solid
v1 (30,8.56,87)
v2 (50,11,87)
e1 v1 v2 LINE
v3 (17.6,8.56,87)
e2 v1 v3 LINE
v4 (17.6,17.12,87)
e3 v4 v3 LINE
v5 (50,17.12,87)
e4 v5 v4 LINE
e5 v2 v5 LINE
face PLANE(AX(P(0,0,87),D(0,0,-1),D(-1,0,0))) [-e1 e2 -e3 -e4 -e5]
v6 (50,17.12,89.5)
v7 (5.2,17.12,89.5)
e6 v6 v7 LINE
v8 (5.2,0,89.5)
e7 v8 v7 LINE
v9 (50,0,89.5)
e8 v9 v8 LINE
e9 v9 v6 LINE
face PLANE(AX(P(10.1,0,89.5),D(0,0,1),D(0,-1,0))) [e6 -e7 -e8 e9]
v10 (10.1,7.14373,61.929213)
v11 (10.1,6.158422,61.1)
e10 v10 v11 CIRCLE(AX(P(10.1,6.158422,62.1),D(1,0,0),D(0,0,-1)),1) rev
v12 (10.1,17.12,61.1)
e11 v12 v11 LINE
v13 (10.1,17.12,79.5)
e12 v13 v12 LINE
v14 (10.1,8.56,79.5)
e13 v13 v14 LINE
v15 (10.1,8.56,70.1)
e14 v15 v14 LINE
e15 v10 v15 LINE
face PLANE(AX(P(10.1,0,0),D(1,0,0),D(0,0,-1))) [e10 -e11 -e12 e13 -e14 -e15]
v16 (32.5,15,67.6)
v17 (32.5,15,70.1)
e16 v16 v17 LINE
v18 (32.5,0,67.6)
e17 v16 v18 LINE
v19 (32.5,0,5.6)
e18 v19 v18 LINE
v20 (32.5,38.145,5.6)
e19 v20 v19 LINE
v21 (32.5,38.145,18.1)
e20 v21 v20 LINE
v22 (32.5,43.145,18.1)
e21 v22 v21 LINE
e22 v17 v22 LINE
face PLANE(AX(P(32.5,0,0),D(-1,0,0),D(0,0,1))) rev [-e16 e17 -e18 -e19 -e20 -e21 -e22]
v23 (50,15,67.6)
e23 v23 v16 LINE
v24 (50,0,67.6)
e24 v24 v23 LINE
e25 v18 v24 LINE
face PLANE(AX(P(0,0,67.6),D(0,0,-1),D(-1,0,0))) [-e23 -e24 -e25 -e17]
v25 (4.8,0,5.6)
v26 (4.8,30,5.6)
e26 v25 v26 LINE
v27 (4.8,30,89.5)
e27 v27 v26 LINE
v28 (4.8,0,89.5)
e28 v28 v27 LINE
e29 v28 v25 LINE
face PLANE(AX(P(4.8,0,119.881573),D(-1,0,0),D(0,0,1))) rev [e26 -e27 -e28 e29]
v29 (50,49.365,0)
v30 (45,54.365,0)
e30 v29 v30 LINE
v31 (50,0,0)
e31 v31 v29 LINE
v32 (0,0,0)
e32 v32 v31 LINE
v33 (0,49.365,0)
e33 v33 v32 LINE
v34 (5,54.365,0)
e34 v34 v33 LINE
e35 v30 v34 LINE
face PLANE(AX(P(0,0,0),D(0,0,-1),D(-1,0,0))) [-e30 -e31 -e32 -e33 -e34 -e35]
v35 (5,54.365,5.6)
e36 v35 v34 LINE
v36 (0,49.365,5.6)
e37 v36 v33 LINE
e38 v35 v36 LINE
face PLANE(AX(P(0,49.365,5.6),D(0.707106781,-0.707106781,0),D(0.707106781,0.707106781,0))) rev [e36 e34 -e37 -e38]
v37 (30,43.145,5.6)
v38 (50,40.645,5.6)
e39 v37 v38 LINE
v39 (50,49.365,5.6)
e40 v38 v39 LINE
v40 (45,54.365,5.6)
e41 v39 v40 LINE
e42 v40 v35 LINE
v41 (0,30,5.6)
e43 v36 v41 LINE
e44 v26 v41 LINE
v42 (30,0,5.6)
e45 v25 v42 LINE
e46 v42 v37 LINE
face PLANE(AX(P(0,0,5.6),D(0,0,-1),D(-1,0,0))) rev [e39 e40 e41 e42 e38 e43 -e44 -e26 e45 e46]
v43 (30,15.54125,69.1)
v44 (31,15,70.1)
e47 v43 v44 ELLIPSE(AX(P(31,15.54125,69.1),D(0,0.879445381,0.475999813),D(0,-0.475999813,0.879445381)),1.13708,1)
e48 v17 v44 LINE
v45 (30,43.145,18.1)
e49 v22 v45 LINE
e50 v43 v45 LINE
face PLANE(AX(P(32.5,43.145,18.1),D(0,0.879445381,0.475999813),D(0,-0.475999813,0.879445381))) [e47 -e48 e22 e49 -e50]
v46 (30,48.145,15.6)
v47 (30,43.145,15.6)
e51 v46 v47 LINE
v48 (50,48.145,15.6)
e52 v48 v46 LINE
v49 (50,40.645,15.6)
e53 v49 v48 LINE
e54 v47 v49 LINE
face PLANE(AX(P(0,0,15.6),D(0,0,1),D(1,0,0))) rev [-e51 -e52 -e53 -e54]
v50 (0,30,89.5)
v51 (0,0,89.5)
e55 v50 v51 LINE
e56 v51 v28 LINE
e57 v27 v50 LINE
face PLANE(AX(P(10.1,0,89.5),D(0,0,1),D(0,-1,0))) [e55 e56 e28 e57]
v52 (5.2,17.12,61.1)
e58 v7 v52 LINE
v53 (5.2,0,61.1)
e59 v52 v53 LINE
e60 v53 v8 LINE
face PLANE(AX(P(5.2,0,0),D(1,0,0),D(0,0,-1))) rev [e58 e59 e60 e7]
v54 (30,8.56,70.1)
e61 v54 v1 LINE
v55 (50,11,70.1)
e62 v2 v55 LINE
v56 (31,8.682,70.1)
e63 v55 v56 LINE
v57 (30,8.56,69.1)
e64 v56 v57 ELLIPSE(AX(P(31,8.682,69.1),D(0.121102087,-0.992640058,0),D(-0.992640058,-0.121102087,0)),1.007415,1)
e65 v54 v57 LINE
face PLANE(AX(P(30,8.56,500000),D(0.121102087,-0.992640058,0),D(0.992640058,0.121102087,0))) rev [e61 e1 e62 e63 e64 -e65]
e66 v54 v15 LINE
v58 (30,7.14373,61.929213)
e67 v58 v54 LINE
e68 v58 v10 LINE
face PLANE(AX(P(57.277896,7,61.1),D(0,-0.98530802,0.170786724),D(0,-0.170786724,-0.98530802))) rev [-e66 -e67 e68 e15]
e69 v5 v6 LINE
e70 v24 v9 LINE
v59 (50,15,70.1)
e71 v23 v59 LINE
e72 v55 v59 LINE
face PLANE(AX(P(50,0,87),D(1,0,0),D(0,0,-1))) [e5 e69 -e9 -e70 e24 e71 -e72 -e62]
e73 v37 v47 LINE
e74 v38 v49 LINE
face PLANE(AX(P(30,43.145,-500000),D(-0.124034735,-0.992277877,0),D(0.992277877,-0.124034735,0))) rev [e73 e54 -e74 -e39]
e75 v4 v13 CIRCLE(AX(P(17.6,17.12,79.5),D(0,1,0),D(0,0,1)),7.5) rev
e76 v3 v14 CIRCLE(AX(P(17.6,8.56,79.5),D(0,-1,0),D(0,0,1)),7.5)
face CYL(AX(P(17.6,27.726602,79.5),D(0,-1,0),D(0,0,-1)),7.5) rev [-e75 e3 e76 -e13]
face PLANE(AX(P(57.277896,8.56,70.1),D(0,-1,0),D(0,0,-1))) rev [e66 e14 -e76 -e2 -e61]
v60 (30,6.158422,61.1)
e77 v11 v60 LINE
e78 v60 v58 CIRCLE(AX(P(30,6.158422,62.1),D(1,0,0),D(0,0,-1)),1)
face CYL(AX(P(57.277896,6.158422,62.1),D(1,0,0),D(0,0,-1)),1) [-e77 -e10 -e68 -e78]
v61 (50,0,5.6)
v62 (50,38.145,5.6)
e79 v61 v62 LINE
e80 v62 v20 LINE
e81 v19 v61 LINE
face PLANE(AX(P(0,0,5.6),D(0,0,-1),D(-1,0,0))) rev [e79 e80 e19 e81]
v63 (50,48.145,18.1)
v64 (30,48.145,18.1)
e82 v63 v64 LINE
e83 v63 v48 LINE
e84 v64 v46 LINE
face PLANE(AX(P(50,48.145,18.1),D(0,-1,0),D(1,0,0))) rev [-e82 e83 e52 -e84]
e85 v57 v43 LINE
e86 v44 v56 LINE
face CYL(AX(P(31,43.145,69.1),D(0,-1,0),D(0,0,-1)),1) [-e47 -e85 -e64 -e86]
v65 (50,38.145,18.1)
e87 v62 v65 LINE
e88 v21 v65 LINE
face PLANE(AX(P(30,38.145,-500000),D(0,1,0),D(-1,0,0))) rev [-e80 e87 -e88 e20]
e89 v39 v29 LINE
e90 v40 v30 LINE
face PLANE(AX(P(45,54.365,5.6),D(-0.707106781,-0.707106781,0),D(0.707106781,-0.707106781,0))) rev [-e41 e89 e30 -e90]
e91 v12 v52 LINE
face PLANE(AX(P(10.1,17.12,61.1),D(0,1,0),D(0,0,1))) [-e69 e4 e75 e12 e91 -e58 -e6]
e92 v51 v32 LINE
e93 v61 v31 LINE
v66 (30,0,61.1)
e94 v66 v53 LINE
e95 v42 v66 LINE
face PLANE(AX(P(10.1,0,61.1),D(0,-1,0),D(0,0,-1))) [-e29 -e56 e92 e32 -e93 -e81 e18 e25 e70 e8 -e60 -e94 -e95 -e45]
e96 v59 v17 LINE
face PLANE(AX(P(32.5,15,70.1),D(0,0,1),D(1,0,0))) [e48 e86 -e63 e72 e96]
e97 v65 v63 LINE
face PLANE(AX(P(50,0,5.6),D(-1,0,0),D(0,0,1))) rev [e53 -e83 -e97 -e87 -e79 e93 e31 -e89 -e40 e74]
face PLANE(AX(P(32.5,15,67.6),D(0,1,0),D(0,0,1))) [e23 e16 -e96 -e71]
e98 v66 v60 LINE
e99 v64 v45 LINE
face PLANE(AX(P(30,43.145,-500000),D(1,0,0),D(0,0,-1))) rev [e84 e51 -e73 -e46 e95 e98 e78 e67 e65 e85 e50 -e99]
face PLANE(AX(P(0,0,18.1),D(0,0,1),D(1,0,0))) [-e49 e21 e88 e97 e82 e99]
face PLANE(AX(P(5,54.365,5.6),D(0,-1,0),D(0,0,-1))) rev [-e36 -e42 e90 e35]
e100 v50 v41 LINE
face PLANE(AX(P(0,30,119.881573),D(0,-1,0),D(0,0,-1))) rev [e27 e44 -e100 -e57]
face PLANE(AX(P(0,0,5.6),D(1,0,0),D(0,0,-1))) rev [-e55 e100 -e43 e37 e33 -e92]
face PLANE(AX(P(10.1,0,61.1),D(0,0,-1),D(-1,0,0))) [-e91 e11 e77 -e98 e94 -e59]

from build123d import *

# Parameters (mm, degrees)
EXTRUDE_1_DEPTH  = 5.6
SKETCH_3_W       = 20
SKETCH_3_H       = 10
EXTRUDE_2_DEPTH  = 2.5
EXTRUDE_3_REACH  = 77.491
EXTRUDE_4_DEPTH  = 2.5
SKETCH_7_W       = 28.4
SKETCH_7_H       = 17.12
EXTRUDE_5_DEPTH  = 4.9
SKETCH_8_W       = 39.9
SKETCH_8_H       = 17.12
EXTRUDE_6_DEPTH  = 2.5
SKETCH_9_W       = 17.5
SKETCH_9_H       = 15
EXTRUDE_7_DEPTH  = 2.5
EXTRUDE_8_DEPTH  = 19.9
FILLET_1_R       = 1
EXTRUDE_9_REACH  = 103.831
SKETCH_14_W      = 4.8
SKETCH_14_H      = 30
EXTRUDE_12_DEPTH = 83.9
EXTRUDE_13_DEPTH = 8.56
FILLET_3_R       = 1


with BuildPart() as part:
    # 草图1 → 凸台-拉伸1 (new body)
    with BuildSketch(Plane.XY):
        Polygon((0, 49.365), (5, 54.365), (45, 54.365), (50, 49.365), (50, 0), (0, 0), align=None)
    extrude(amount=EXTRUDE_1_DEPTH)

    # 草图5 → 凸台-拉伸3 (add, up to next)
    with BuildSketch(Plane(origin=(0, 0, 15.6), x_dir=(-1, 0, 0), z_dir=(0, 0, -1)), mode=Mode.PRIVATE) as extrude_3_sk1:
        Polygon((-30, 43.145), (-50, 40.645), (-50, 38.145), (-30, 38.145), align=None)
    extrude_3_tool1 = extrude(extrude_3_sk1.sketch, amount=EXTRUDE_3_REACH, mode=Mode.PRIVATE) - part.part


with BuildPart() as body_2:
    # 草图3 → 凸台-拉伸2 (new body)
    with BuildSketch(Plane.XY.offset(15.6)):
        with Locations((40, 43.145)):
            Rectangle(SKETCH_3_W, SKETCH_3_H)
    extrude(amount=EXTRUDE_2_DEPTH)


with BuildPart() as part_1:
    add(part.part)

    add(body_2.part)  # 凸台-拉伸3 merges body 2
    add(extrude_3_tool1.solids().sort_by_distance((38.888889, 40.089444, 15.6))[0])

    # 草图6 → 凸台-拉伸4 (add)
    with BuildSketch(Plane.ZY.offset(-30)):
        Polygon((18.1, 43.145), (70.1, 15), (70.1, 0), (5.6, 0), (5.6, 38.145), (18.1, 38.145), align=None)
    extrude(amount=-EXTRUDE_4_DEPTH)

    # 草图9 → 凸台-拉伸7 (add)
    with BuildSketch(Plane.XY.offset(70.1)):
        with Locations((41.25, 7.5)):
            Rectangle(SKETCH_9_W, SKETCH_9_H)
    extrude(amount=-EXTRUDE_7_DEPTH)



with BuildPart() as body_2_2:
    # 草图7 → 凸台-拉伸5 (new body)
    with BuildSketch(Plane.ZY.offset(-5.2)):
        with Locations((75.3, 8.56)):
            Rectangle(SKETCH_7_W, SKETCH_7_H)
    extrude(amount=-EXTRUDE_5_DEPTH)

    # 草图8 → 凸台-拉伸6 (add)
    with BuildSketch(Plane.XY.offset(89.5)):
        with Locations((30.05, 8.56)):
            Rectangle(SKETCH_8_W, SKETCH_8_H)
    extrude(amount=-EXTRUDE_6_DEPTH)


with BuildPart() as part_2:
    add(part_1.part)

    add(body_2_2.part)  # 凸台-拉伸8 merges body 2 2
    # 草图11 → 凸台-拉伸8 (add)
    with BuildSketch(Plane(origin=(10.1, 0, 0), x_dir=(0, 0, -1), z_dir=(1, 0, 0))):
        Polygon((-61.1, 0), (-61.1, 7), (-70.1, 8.56), (-87, 8.56), (-87, 0), align=None)
    extrude(amount=EXTRUDE_8_DEPTH)

    # 圆角1
    fillet_1_edges = [part_2.edges().sort_by_distance(p)[0] for p in [
        (20.05, 7, 61.1),
    ]]
    fillet(fillet_1_edges, radius=FILLET_1_R)

    # 草图12 → 凸台-拉伸9 (add, up to next)
    with BuildSketch(Plane.XY.offset(70.1), mode=Mode.PRIVATE) as extrude_9_sk1:
        Polygon((30, 0), (30, 8.56), (50, 11), (50, 0), align=None)
    extrude_9_tool1 = extrude(extrude_9_sk1.sketch, amount=EXTRUDE_9_REACH, mode=Mode.PRIVATE) - part_2.part
    add(extrude_9_tool1.solids().sort_by_distance((40.415815, 4.915365, 70.1))[0])

    # 草图14 → 凸台-拉伸12 (add)
    with BuildSketch(Plane.XY.offset(5.6)):
        with Locations((2.4, 15)):
            Rectangle(SKETCH_14_W, SKETCH_14_H)
    extrude(amount=EXTRUDE_12_DEPTH)

    # 草图15 → 凸台-拉伸13 (add)
    with BuildSketch(Plane(origin=(0, 8.56, 0), x_dir=(1, 0, 0), z_dir=(0, 1, 0))):
        with BuildLine():
            Line((10.1, -79.5), (10.1, -87))
            Line((10.1, -87), (17.6, -87))
            ThreePointArc((17.6, -87), (12.296699141, -84.803300859), (10.1, -79.5))
        make_face()
    extrude(amount=EXTRUDE_13_DEPTH)

    # 圆角3
    # the kernel refuses this fillet: 1 mm, written as the material it takes off along each edge
    with BuildSketch(Plane(origin=(30, 17.5, 70.1), x_dir=(0, 0, -1), z_dir=(0, -1, 0))) as fillet_3_piece_1_section:
        with BuildLine():
            CenterArc((FILLET_3_R, FILLET_3_R), FILLET_3_R, 180, 90)
            Line((0, FILLET_3_R), (0, 0))
            Line((0, 0), (FILLET_3_R, 0))
        make_face()
    fillet_3_piece_1 = extrude(amount=11.44, mode=Mode.PRIVATE)
    fillet_3_piece_1 = split(fillet_3_piece_1, bisect_by=Plane(origin=(30.761446194, 8.652896436, 69.873228865), z_dir=(-0.12110208706144665, 0.9926400578806811, 0)), keep=Keep.TOP, mode=Mode.PRIVATE)
    add(fillet_3_piece_1, mode=Mode.SUBTRACT)


solid = part_2.part
